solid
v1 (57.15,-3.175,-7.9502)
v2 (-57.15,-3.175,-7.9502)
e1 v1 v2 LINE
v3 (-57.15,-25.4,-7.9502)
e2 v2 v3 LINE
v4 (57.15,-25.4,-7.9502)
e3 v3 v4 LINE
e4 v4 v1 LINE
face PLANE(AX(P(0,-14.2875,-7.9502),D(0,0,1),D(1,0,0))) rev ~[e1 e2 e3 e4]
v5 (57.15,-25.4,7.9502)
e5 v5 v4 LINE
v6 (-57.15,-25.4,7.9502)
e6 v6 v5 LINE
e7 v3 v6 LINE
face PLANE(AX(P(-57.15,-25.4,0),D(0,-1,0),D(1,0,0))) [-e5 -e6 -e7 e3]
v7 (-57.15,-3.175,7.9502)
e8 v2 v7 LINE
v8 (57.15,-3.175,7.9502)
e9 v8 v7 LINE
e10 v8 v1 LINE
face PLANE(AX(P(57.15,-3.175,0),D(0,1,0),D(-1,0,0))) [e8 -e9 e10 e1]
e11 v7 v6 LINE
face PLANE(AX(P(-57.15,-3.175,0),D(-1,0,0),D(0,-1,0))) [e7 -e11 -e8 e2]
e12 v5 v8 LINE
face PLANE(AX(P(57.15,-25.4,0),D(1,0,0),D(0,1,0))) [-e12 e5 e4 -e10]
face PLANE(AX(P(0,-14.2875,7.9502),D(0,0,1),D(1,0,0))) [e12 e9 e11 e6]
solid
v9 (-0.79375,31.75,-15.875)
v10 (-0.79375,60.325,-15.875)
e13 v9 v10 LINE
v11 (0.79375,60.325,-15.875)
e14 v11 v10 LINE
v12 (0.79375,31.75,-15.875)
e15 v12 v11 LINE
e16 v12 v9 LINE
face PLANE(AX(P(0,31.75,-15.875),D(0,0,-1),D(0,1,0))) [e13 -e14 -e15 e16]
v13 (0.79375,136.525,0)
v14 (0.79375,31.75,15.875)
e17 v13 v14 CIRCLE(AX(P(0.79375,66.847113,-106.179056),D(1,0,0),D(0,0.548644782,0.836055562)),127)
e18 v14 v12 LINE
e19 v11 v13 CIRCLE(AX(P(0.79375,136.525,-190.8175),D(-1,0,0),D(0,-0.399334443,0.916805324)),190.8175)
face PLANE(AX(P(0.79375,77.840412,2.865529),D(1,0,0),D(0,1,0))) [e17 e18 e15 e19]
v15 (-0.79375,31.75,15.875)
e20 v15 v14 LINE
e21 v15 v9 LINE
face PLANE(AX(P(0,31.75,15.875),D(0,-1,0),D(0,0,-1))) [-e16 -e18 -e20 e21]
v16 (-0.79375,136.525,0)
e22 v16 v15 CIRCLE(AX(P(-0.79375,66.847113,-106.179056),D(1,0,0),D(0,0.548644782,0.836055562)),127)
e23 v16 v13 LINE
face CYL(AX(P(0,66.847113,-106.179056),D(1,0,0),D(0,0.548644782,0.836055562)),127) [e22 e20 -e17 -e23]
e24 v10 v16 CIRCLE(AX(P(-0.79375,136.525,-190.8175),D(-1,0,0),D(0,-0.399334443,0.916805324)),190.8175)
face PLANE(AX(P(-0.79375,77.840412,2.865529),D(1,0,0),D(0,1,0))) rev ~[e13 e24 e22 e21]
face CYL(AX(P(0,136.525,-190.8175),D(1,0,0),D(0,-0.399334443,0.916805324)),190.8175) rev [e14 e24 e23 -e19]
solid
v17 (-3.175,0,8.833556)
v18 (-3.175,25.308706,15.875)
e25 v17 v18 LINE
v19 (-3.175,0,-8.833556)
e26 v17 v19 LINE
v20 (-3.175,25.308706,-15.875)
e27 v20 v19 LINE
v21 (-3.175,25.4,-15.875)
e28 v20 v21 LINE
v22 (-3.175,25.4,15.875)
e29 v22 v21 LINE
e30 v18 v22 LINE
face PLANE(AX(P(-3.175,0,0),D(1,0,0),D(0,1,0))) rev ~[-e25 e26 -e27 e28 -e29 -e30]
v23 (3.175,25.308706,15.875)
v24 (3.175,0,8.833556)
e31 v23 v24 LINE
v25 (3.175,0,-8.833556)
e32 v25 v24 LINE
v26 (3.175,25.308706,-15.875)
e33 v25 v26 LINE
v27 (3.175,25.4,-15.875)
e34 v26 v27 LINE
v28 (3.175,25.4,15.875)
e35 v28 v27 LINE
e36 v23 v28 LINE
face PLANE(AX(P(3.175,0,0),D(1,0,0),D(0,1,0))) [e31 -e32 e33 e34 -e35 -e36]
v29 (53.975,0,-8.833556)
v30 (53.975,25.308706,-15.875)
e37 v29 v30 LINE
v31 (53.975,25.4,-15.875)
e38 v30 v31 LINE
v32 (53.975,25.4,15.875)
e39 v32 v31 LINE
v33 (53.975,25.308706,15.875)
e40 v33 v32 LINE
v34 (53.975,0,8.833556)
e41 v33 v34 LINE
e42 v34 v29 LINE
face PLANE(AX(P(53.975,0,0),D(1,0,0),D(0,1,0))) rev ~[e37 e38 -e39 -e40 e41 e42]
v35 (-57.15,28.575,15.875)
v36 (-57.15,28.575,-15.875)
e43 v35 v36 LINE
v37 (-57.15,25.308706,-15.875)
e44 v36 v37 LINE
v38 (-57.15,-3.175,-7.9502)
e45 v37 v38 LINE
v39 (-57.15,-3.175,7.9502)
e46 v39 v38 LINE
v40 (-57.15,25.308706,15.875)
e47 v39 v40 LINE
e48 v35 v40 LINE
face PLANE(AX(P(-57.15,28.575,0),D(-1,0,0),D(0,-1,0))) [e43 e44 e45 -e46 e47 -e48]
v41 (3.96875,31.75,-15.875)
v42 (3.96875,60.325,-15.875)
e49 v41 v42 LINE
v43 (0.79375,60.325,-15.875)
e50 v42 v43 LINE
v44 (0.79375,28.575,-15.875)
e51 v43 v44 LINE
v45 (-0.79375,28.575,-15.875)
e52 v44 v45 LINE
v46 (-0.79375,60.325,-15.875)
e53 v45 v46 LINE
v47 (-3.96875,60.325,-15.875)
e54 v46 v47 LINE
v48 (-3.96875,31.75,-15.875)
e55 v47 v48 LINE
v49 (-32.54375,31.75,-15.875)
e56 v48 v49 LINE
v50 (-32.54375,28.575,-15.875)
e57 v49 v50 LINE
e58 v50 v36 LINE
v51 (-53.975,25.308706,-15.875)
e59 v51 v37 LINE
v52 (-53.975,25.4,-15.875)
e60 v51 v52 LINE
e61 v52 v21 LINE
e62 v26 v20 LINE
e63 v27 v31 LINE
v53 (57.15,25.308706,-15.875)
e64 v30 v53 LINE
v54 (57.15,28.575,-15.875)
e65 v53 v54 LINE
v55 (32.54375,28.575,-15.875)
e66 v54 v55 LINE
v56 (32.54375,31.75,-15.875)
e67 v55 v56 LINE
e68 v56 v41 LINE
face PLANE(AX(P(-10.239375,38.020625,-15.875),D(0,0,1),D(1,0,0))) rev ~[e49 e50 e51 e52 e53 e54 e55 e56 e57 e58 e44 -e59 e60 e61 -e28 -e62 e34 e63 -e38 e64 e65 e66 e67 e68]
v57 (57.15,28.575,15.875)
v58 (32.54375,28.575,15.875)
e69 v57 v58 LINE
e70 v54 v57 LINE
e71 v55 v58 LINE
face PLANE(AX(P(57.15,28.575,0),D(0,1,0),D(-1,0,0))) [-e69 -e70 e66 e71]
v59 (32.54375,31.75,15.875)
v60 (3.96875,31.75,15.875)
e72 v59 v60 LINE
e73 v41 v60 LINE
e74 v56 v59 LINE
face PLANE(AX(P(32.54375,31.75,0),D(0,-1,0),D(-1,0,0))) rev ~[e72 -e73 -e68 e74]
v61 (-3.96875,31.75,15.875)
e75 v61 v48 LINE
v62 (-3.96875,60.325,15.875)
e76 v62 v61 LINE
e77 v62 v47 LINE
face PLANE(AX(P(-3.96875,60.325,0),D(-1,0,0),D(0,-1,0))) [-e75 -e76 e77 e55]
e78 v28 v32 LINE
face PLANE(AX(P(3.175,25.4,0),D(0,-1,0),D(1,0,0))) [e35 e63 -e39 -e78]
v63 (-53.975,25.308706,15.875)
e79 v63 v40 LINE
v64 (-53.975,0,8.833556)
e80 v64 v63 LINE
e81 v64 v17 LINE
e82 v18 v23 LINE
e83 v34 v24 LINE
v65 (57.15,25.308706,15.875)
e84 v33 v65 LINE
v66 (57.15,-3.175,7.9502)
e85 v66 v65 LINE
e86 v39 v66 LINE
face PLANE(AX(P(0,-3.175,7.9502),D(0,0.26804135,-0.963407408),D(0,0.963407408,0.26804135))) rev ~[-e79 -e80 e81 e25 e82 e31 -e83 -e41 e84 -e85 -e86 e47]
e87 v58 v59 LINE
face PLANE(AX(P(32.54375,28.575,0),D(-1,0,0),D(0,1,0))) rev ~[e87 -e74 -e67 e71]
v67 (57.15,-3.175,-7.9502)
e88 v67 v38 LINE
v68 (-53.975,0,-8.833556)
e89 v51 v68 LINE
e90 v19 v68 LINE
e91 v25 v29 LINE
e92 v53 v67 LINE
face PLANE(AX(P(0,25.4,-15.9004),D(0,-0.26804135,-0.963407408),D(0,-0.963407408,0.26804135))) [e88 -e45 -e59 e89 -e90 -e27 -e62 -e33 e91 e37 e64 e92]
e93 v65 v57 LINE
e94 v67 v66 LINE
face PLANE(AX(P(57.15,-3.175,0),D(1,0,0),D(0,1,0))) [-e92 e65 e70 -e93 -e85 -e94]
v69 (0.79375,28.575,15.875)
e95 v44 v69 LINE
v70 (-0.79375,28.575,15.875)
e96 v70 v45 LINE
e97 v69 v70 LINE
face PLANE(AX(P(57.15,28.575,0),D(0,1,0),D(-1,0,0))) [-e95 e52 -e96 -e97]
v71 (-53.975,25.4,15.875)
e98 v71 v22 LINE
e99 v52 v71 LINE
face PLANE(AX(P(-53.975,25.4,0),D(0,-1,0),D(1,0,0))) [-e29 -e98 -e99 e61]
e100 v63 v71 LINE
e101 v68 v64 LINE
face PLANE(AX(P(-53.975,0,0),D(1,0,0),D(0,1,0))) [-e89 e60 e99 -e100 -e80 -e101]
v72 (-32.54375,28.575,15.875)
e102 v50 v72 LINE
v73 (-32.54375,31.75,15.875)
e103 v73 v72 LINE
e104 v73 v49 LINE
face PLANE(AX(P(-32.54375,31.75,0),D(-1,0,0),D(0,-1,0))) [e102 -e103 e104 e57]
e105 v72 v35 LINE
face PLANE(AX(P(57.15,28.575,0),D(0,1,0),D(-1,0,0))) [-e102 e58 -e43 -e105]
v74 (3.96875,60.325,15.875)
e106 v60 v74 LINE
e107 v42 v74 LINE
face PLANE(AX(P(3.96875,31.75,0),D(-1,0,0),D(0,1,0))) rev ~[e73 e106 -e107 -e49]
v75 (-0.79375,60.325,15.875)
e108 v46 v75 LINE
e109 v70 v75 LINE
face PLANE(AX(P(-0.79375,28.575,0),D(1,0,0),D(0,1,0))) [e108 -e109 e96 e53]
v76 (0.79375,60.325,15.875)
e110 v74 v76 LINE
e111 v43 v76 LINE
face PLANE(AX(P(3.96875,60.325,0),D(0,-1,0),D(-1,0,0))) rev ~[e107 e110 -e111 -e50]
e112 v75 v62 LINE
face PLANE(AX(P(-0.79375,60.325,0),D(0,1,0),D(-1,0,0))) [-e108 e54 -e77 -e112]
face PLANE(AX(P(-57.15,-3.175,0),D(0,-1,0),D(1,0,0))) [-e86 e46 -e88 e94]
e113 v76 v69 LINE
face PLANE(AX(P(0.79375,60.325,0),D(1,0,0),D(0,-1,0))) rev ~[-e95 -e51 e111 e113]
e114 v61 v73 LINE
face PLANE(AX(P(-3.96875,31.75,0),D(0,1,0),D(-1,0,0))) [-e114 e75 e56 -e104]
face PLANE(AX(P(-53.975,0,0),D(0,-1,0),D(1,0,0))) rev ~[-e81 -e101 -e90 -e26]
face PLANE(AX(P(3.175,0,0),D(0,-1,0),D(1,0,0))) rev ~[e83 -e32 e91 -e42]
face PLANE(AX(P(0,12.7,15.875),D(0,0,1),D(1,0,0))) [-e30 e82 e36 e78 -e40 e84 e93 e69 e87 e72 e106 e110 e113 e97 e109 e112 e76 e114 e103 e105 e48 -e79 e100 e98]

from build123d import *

# Parameters (mm, degrees)
F0_W          = 50.8
F0_H          = 25.4
F1_DEPTH      = 15.875
F1_DEPTH_BACK = 15.875
F2_DEPTH      = 7.9502
F2_DEPTH_BACK = 7.9502
F3_DEPTH      = 15.875
F3_DEPTH_BACK = 15.875
F7_DEPTH      = 57.15
F7_DEPTH_BACK = 57.15
F9_DEPTH      = 0.79375
F9_DEPTH_BACK = 0.79375


# Not quite as in the source:
# - the program builds the solid bodies; features that only make, move or delete a surface that nothing else refers to are left out


with BuildPart() as f1:
    # F0 (on Top) → F1 (new body, two sides)
    with BuildSketch(Plane.XY) as f1_sk:
        Polygon((-57.15, -3.175), (0, -3.175), (57.15, -3.175), (57.15, 28.575), (32.54375, 28.575), (0.79375, 28.575), (-0.79375, 28.575), (-32.54375, 28.575), (-57.15, 28.575), align=None)
        with Locations((-28.575, 12.7)):
            Rectangle(F0_W, F0_H, mode=Mode.SUBTRACT)
        with Locations((28.575, 12.7)):
            Rectangle(F0_W, F0_H, mode=Mode.SUBTRACT)
    extrude(amount=F1_DEPTH)
    extrude(f1_sk.sketch, amount=-F1_DEPTH_BACK)

    # F0 (on Top) → F3 (join, two sides)
    with BuildSketch(Plane.XY) as f3_sk:
        Polygon((-32.54375, 31.75), (-32.54375, 28.575), (-0.79375, 28.575), (-0.79375, 60.325), (-3.96875, 60.325), (-3.96875, 31.75), align=None)
        Polygon((0.79375, 28.575), (32.54375, 28.575), (32.54375, 31.75), (3.96875, 31.75), (3.96875, 60.325), (0.79375, 60.325), align=None)
    extrude(amount=F3_DEPTH)
    extrude(f3_sk.sketch, amount=-F3_DEPTH_BACK)

    # F6 (on Right) → F7 (cut, two sides)
    with BuildSketch(Plane.YZ) as f7_sk:
        Polygon((25.4, -15.9004), (-3.175, -7.9502), (-3.175, -15.9004), align=None)
        Polygon((-3.175, 15.9004), (-3.175, 7.9502), (25.4, 15.9004), align=None)
    extrude(amount=-F7_DEPTH, mode=Mode.SUBTRACT)
    extrude(f7_sk.sketch, amount=F7_DEPTH_BACK, mode=Mode.SUBTRACT)


with BuildPart() as f2:
    # F0 (on Top) → F2 (new body, two sides)
    with BuildSketch(Plane.XY) as f2_sk:
        Polygon((57.15, -3.175), (0, -3.175), (-57.15, -3.175), (-57.15, -25.4), (57.15, -25.4), align=None)
    extrude(amount=F2_DEPTH)
    extrude(f2_sk.sketch, amount=-F2_DEPTH_BACK)


with BuildPart() as f9:
    # F8 (on Right) → F9 (new body, two sides)
    with BuildSketch(Plane.YZ) as f9_sk:
        with BuildLine():
            ThreePointArc((60.325, -15.875), (97.606959116, -4.0109037567), (136.525, 0))
            ThreePointArc((136.525, 0), (85.8723958548, 19.3878126418), (31.75, 15.875))
            Line((31.75, 15.875), (31.75, -15.875))
            Line((31.75, -15.875), (60.325, -15.875))
        make_face()
    extrude(amount=F9_DEPTH)
    extrude(f9_sk.sketch, amount=-F9_DEPTH_BACK)


solid = Compound([f1.part, f2.part, f9.part])
